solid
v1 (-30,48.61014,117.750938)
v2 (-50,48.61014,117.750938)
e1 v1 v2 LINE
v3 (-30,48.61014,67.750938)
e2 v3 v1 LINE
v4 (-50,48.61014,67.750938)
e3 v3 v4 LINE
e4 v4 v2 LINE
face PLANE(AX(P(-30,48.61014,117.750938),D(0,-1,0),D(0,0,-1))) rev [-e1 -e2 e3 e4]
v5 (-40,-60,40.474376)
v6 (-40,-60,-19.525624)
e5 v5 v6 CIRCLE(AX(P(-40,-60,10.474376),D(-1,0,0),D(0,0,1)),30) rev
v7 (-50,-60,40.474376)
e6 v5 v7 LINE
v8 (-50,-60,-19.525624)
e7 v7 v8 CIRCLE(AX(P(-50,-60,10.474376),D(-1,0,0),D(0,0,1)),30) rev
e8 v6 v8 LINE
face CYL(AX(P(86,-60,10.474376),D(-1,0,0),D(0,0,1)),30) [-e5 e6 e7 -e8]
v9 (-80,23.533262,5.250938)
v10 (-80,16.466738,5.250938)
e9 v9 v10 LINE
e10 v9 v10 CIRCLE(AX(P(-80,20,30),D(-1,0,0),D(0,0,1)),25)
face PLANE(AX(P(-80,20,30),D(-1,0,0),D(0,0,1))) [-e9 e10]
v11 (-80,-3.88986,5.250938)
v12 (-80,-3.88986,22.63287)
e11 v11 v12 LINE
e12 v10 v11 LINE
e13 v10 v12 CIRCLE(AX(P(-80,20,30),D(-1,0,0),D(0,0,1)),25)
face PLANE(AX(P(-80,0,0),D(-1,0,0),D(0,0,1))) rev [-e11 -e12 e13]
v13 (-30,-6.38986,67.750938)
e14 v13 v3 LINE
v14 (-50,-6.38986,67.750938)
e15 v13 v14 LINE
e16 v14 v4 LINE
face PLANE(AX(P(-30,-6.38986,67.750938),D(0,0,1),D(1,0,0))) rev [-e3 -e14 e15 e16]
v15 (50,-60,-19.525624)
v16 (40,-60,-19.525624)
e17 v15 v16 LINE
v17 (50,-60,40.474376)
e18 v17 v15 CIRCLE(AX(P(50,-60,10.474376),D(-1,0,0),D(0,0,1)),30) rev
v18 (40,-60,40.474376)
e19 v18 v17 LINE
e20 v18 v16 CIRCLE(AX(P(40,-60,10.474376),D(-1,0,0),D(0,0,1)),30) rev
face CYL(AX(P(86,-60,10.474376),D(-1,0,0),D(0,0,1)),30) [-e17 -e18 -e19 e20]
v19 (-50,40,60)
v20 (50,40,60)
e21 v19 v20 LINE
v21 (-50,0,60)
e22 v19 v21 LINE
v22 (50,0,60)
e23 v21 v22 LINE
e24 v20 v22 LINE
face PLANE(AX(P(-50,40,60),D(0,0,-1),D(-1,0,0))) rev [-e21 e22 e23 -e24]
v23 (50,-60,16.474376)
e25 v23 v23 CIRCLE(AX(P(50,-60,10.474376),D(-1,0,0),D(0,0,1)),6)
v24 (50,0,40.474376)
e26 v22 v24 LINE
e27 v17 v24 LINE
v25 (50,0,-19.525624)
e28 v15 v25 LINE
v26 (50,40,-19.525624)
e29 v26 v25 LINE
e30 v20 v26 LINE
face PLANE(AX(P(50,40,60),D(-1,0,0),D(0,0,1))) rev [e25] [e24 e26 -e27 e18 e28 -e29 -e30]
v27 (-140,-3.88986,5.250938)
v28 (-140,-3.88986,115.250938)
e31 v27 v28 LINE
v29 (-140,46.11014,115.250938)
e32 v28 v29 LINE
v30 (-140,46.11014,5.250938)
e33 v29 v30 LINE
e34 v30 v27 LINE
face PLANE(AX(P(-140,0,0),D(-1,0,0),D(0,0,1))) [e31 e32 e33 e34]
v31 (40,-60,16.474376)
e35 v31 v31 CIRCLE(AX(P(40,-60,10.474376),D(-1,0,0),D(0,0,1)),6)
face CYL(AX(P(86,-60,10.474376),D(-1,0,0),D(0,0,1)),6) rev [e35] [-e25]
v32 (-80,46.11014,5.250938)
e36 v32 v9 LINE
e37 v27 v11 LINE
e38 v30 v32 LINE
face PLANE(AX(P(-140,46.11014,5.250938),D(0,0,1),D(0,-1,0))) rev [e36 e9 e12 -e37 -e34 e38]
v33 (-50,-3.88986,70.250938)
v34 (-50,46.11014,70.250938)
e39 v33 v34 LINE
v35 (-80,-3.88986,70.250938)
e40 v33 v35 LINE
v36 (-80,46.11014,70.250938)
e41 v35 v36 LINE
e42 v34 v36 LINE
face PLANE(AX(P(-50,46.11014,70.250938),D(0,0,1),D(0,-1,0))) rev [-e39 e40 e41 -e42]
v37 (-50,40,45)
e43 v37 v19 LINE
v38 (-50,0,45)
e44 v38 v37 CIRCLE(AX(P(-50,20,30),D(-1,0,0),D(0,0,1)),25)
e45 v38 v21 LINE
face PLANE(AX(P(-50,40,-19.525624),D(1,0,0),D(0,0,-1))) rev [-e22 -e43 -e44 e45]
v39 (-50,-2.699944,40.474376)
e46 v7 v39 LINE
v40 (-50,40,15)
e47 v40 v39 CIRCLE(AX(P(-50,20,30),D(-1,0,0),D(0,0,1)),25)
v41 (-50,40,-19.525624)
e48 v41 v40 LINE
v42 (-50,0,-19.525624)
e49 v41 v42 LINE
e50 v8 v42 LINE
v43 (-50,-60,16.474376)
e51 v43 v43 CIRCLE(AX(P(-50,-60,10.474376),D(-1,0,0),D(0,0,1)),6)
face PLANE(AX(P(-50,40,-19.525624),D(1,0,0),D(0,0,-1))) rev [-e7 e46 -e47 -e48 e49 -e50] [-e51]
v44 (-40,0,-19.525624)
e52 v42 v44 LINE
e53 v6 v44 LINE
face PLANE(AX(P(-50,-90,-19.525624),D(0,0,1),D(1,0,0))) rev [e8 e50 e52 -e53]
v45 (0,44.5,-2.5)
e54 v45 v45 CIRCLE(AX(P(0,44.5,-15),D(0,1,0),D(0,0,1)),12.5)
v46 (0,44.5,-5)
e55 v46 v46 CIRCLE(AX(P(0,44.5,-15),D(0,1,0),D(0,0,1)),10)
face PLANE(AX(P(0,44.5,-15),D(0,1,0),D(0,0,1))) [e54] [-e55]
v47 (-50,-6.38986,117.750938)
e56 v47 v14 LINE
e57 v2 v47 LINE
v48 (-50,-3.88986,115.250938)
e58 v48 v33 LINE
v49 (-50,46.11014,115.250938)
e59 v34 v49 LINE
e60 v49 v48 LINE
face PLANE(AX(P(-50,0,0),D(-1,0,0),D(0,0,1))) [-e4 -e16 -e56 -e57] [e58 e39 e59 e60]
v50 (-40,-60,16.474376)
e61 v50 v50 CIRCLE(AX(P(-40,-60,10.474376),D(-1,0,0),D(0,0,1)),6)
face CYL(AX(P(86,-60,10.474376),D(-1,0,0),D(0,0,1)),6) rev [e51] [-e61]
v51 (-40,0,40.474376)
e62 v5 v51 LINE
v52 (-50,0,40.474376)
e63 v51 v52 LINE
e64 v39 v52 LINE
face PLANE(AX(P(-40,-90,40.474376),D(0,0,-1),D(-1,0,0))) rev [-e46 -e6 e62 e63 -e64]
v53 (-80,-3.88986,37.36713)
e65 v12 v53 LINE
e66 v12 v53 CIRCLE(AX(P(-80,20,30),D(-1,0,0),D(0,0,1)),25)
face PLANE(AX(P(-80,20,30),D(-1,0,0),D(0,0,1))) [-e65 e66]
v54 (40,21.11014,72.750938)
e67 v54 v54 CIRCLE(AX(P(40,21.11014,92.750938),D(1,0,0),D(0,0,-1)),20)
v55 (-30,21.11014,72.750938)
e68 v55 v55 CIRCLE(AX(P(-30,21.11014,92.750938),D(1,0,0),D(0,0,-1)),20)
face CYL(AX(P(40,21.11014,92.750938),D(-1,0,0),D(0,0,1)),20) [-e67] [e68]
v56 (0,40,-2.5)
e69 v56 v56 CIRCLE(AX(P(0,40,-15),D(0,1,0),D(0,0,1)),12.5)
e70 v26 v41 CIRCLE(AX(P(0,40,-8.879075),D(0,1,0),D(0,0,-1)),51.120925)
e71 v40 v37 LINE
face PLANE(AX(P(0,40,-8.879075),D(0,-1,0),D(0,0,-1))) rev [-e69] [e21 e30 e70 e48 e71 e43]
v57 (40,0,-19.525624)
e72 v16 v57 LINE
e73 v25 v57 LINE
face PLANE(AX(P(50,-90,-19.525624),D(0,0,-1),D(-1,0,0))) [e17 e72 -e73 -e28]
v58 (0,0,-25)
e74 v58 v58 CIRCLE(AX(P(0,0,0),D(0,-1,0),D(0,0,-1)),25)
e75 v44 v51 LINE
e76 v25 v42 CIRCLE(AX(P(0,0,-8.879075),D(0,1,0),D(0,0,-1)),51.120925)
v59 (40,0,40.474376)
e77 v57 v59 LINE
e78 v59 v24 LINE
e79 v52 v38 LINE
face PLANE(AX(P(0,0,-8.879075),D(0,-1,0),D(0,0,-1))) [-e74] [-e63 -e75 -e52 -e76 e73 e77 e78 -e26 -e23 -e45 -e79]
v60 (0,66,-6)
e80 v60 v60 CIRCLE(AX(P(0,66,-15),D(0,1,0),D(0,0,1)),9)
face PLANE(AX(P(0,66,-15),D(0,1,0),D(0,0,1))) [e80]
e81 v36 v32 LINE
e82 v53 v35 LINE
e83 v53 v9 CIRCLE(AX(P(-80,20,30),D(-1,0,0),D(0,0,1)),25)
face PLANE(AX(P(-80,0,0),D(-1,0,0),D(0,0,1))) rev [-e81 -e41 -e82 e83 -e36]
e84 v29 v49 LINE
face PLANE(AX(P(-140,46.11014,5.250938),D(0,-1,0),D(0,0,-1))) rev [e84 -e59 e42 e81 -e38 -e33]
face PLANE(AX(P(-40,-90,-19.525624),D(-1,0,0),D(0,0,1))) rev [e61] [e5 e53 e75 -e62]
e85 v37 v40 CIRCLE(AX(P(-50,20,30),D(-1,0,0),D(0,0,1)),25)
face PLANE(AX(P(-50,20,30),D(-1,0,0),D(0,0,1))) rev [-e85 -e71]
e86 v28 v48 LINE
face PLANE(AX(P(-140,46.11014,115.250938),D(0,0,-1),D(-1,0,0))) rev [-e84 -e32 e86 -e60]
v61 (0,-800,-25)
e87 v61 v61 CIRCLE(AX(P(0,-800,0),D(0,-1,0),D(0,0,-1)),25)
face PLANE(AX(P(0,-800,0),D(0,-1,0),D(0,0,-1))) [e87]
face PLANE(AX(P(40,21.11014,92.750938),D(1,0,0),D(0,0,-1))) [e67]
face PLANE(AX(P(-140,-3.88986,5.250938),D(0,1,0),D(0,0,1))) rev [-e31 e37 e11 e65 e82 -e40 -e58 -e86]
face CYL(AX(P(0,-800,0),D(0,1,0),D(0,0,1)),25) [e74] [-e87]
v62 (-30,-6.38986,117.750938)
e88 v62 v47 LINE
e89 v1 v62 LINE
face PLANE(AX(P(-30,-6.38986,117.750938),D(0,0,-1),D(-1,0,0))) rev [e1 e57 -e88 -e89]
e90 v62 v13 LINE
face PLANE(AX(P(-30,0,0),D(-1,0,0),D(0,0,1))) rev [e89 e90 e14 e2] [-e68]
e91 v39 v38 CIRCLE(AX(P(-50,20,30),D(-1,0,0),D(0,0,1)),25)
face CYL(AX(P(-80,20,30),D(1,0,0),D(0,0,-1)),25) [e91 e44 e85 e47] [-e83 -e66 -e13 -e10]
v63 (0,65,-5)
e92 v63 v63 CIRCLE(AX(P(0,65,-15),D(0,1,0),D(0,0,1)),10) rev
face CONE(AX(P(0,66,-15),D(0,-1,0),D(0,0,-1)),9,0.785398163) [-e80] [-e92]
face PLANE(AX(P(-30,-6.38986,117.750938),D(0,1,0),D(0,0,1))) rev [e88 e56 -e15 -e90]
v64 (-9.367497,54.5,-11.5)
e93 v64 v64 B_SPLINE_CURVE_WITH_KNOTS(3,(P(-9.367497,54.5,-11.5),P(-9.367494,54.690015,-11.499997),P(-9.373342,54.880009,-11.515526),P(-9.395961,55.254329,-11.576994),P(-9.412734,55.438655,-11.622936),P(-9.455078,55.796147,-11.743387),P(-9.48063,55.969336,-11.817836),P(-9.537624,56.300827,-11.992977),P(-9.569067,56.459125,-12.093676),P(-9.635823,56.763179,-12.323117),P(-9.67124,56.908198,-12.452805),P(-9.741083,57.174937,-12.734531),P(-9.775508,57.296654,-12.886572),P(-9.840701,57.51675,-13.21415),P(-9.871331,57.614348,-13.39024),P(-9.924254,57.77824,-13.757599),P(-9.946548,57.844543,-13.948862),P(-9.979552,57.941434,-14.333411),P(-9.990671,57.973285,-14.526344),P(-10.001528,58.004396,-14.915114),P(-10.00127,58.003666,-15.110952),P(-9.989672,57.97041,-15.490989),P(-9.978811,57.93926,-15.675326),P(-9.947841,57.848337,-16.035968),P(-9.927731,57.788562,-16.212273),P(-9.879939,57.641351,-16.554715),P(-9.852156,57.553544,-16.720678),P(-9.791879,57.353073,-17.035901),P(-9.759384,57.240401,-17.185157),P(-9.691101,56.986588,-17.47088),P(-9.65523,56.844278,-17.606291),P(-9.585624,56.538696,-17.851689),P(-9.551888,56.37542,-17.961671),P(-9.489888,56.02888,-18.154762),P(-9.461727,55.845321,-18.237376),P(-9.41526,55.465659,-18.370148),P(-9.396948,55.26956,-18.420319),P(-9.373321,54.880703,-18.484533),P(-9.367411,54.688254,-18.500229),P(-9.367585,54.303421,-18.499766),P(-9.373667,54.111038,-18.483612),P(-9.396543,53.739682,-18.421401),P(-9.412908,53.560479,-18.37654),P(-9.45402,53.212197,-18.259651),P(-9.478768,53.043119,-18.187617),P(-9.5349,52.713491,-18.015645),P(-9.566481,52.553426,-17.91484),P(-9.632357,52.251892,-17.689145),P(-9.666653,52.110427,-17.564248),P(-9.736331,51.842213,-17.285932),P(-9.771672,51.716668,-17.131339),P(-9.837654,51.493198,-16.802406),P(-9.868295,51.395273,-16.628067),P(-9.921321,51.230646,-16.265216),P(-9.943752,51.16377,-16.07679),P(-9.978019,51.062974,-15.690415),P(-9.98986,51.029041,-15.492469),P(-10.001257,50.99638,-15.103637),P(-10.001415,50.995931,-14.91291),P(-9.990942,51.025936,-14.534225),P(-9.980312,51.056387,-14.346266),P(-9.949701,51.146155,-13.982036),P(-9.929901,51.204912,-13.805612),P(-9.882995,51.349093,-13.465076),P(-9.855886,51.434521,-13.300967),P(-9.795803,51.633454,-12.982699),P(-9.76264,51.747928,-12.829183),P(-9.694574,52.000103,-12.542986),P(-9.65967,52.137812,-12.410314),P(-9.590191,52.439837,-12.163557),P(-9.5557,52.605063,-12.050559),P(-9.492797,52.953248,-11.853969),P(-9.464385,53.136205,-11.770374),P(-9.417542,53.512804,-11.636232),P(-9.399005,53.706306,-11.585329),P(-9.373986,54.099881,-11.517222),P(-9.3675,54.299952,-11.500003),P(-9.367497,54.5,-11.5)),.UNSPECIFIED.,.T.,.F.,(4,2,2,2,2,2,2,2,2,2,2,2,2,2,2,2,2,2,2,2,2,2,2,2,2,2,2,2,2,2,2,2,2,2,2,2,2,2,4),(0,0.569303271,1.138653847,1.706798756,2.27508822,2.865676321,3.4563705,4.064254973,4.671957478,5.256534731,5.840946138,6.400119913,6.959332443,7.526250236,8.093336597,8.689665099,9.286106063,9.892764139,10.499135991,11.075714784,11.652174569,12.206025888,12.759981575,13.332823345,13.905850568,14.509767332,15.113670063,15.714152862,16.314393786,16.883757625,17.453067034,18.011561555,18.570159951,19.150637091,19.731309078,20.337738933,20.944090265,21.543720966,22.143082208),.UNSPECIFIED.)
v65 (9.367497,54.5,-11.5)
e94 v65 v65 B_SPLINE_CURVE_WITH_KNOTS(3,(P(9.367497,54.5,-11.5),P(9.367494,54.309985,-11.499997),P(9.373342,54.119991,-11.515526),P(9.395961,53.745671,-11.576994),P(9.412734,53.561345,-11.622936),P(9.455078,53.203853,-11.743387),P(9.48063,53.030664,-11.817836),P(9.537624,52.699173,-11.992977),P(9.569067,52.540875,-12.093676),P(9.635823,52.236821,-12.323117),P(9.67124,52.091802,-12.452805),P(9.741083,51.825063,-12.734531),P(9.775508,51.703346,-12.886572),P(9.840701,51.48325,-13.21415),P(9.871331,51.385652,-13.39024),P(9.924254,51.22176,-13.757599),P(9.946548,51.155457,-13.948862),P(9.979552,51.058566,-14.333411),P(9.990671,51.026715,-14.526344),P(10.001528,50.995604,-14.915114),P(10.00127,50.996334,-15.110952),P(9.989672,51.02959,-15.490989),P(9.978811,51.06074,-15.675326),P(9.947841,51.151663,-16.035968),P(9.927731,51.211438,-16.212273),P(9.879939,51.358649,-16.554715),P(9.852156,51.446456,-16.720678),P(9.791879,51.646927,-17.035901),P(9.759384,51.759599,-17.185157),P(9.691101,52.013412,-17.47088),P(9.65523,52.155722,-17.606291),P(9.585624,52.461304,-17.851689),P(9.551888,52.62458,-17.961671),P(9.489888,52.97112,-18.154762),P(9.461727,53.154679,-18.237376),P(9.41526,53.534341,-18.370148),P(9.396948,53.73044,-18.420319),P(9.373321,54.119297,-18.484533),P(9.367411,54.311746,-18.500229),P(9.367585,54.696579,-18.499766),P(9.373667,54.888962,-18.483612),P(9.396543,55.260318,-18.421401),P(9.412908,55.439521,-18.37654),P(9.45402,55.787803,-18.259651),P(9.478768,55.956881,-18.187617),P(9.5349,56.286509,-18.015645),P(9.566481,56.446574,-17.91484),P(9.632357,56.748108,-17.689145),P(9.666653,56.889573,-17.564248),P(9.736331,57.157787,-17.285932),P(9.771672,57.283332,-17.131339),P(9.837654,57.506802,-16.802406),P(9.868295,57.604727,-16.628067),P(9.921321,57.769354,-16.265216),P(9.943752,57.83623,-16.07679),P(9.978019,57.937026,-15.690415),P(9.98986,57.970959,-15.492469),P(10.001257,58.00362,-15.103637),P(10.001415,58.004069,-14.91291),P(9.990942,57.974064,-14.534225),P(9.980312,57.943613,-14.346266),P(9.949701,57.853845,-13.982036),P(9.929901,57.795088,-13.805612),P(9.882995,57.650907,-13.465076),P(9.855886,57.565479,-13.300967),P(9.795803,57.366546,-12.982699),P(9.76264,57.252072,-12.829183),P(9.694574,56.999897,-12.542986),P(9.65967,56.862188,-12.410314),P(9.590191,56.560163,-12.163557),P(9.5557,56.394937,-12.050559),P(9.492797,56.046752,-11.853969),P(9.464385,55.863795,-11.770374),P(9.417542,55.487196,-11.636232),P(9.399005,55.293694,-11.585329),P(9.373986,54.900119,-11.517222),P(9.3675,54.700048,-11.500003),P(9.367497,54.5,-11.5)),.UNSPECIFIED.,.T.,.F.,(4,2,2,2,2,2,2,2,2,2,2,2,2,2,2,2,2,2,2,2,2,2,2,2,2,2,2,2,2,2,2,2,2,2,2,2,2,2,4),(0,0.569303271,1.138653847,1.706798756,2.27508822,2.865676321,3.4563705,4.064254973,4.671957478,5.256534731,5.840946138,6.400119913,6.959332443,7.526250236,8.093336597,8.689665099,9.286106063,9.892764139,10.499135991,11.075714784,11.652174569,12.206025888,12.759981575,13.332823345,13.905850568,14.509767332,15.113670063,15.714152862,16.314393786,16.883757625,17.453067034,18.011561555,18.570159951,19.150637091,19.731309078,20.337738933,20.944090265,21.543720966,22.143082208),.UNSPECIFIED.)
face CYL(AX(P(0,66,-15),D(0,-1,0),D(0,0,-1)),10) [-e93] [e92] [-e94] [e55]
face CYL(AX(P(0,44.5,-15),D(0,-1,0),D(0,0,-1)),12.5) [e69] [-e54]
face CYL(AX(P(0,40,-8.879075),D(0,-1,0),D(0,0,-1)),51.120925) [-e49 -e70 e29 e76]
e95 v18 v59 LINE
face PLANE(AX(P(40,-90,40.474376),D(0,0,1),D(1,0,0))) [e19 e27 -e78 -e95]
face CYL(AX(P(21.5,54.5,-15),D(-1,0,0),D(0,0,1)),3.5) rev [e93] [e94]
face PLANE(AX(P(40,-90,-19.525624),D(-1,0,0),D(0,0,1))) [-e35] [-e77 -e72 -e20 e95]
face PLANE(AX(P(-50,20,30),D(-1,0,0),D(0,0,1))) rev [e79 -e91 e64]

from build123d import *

# Parameters (mm, degrees)
SALIENTE_EXTRUIR2_DEPTH    = 40
CROQUIS2_R                 = 12.5
SALIENTE_EXTRUIR3_DEPTH    = 4.5
CROQUIS3_R                 = 10
SALIENTE_EXTRUIR4_DEPTH    = 21.5
CORTAR_EXTRUIR1_DEPTH      = 21.5
CORTAR_EXTRUIR1_DEPTH_BACK = 21.5
CROQUIS4_R                 = 3.5
CHAFL_N1_SIZE              = 1
CROQUIS5_R                 = 25
SALIENTE_EXTRUIR5_DEPTH    = 30
CROQUIS6_W                 = 110
CROQUIS6_H                 = 50
SALIENTE_EXTRUIR6_DEPTH    = 60
CROQUIS10_W                = 45
CROQUIS10_H                = 50
SALIENTE_EXTRUIR7_DEPTH    = 30
CROQUIS12_W                = 50
CROQUIS12_H                = 55
SALIENTE_EXTRUIR8_DEPTH    = 20
CROQUIS13_R                = 20
SALIENTE_EXTRUIR9_DEPTH    = 70
CROQUIS14_W                = 10
CROQUIS14_H                = 60
SALIENTE_EXTRUIR10_DEPTH   = 90
CROQUIS15_R                = 6
CORTAR_EXTRUIR4_DEPTH      = 136
CROQUIS16_R                = 25
SALIENTE_EXTRUIR11_DEPTH   = 800


with BuildPart() as part:
    # Croquis1 → Saliente-Extruir2 (new body)
    with BuildSketch(Plane(origin=(0, 0, 0), x_dir=(1, 0, 0), z_dir=(0, 1, 0))):
        with BuildLine():
            Line((-50, 19.52562419), (-50, -60))
            Line((-50, -60), (50, -60))
            Line((50, -60), (50, 19.52562419))
            ThreePointArc((50, 19.52562419), (0, 60), (-50, 19.52562419))
        make_face()
    extrude(amount=SALIENTE_EXTRUIR2_DEPTH)

    # Croquis2 → Saliente-Extruir3 (add)
    with BuildSketch(Plane(origin=(0, 40, 0), x_dir=(1, 0, 0), z_dir=(0, 1, 0))):
        with Locations((0, 15)):
            Circle(CROQUIS2_R)
    extrude(amount=SALIENTE_EXTRUIR3_DEPTH)

    # Croquis3 → Saliente-Extruir4 (add)
    with BuildSketch(Plane(origin=(0, 44.5, 0), x_dir=(1, 0, 0), z_dir=(0, 1, 0))):
        with Locations((0, 15)):
            Circle(CROQUIS3_R)
    extrude(amount=SALIENTE_EXTRUIR4_DEPTH)

    # Croquis4 → Cortar-Extruir1 (cut, two sides: drawn at the far end of the back side and taken through both)
    with BuildSketch(Plane(origin=(0, 0, 0), x_dir=(0, 0, -1), z_dir=(1, 0, 0)).offset(-CORTAR_EXTRUIR1_DEPTH_BACK)):
        with Locations((15, 54.5)):
            Circle(CROQUIS4_R)
    extrude(amount=CORTAR_EXTRUIR1_DEPTH + CORTAR_EXTRUIR1_DEPTH_BACK, mode=Mode.SUBTRACT)

    # Chaflán1
    chafl_n1_edges = [part.edges().sort_by_distance(p)[0] for p in [
        (-10, 66, -15),
    ]]
    chamfer(chafl_n1_edges, length=CHAFL_N1_SIZE)

    # Croquis5 → Saliente-Extruir5 (add)
    with BuildSketch(Plane.ZY.offset(50)):
        with Locations((30, 20)):
            Circle(CROQUIS5_R)
    extrude(amount=SALIENTE_EXTRUIR5_DEPTH)

    # Croquis6 → Saliente-Extruir6 (add)
    with BuildSketch(Plane.ZY.offset(80)):
        with Locations((60.2509382, 21.110140405)):
            Rectangle(CROQUIS6_W, CROQUIS6_H)
    extrude(amount=SALIENTE_EXTRUIR6_DEPTH)

    # Croquis10 → Saliente-Extruir7 (add)
    with BuildSketch(Plane(origin=(-80, 0, 0), x_dir=(0, 0, -1), z_dir=(1, 0, 0))):
        with Locations((-92.7509382, 21.110140405)):
            Rectangle(CROQUIS10_W, CROQUIS10_H)
    extrude(amount=SALIENTE_EXTRUIR7_DEPTH)

    # Croquis12 → Saliente-Extruir8 (add)
    with BuildSketch(Plane(origin=(-50, 0, 0), x_dir=(0, 0, -1), z_dir=(1, 0, 0))):
        with Locations((-92.7509382, 21.110140405)):
            Rectangle(CROQUIS12_W, CROQUIS12_H)
    extrude(amount=SALIENTE_EXTRUIR8_DEPTH)

    # Croquis13 → Saliente-Extruir9 (add)
    with BuildSketch(Plane(origin=(-30, 0, 0), x_dir=(0, 0, -1), z_dir=(1, 0, 0))):
        with Locations((-92.7509382, 21.110140405)):
            Circle(CROQUIS13_R)
    extrude(amount=SALIENTE_EXTRUIR9_DEPTH)

    # Croquis14 → Saliente-Extruir10 (add)
    with BuildSketch(Plane.XZ):
        with Locations((-45, 10.47437581)):
            Rectangle(CROQUIS14_W, CROQUIS14_H)
    saliente_extruir10 = extrude(amount=SALIENTE_EXTRUIR10_DEPTH)

    # Simetría1: Saliente-Extruir10 across plane
    add(saliente_extruir10.mirror(Plane(origin=(0, 0, 0), x_dir=(0, 0, 1), z_dir=(1, 0, 0))))

    # Croquis15 → Cortar-Extruir4 (cut)
    with BuildSketch(Plane.ZY.offset(50)):
        with BuildLine():
            Line((-19.52562419, -90), (10.474375689, -90))
            ThreePointArc((10.474375689, -90), (-10.738827668, -81.213203393), (-19.52562419, -60))
            Line((-19.52562419, -60), (-19.52562419, -90))
        make_face()
        with BuildLine():
            Line((40.47437581, -90), (40.47437581, -60))
            ThreePointArc((40.47437581, -60), (31.687579203, -81.213203478), (10.474375689, -90))
            Line((10.474375689, -90), (40.47437581, -90))
        make_face()
        with Locations((10.47437581, -60)):
            Circle(CROQUIS15_R)
    extrude(amount=-CORTAR_EXTRUIR4_DEPTH, mode=Mode.SUBTRACT)

    # Croquis16 → Saliente-Extruir11 (add)
    with BuildSketch(Plane(origin=(0, 0, 0), x_dir=(-1, 0, 0), z_dir=(0, -1, 0))):
        Circle(CROQUIS16_R)
    extrude(amount=SALIENTE_EXTRUIR11_DEPTH)


solid = part.part
